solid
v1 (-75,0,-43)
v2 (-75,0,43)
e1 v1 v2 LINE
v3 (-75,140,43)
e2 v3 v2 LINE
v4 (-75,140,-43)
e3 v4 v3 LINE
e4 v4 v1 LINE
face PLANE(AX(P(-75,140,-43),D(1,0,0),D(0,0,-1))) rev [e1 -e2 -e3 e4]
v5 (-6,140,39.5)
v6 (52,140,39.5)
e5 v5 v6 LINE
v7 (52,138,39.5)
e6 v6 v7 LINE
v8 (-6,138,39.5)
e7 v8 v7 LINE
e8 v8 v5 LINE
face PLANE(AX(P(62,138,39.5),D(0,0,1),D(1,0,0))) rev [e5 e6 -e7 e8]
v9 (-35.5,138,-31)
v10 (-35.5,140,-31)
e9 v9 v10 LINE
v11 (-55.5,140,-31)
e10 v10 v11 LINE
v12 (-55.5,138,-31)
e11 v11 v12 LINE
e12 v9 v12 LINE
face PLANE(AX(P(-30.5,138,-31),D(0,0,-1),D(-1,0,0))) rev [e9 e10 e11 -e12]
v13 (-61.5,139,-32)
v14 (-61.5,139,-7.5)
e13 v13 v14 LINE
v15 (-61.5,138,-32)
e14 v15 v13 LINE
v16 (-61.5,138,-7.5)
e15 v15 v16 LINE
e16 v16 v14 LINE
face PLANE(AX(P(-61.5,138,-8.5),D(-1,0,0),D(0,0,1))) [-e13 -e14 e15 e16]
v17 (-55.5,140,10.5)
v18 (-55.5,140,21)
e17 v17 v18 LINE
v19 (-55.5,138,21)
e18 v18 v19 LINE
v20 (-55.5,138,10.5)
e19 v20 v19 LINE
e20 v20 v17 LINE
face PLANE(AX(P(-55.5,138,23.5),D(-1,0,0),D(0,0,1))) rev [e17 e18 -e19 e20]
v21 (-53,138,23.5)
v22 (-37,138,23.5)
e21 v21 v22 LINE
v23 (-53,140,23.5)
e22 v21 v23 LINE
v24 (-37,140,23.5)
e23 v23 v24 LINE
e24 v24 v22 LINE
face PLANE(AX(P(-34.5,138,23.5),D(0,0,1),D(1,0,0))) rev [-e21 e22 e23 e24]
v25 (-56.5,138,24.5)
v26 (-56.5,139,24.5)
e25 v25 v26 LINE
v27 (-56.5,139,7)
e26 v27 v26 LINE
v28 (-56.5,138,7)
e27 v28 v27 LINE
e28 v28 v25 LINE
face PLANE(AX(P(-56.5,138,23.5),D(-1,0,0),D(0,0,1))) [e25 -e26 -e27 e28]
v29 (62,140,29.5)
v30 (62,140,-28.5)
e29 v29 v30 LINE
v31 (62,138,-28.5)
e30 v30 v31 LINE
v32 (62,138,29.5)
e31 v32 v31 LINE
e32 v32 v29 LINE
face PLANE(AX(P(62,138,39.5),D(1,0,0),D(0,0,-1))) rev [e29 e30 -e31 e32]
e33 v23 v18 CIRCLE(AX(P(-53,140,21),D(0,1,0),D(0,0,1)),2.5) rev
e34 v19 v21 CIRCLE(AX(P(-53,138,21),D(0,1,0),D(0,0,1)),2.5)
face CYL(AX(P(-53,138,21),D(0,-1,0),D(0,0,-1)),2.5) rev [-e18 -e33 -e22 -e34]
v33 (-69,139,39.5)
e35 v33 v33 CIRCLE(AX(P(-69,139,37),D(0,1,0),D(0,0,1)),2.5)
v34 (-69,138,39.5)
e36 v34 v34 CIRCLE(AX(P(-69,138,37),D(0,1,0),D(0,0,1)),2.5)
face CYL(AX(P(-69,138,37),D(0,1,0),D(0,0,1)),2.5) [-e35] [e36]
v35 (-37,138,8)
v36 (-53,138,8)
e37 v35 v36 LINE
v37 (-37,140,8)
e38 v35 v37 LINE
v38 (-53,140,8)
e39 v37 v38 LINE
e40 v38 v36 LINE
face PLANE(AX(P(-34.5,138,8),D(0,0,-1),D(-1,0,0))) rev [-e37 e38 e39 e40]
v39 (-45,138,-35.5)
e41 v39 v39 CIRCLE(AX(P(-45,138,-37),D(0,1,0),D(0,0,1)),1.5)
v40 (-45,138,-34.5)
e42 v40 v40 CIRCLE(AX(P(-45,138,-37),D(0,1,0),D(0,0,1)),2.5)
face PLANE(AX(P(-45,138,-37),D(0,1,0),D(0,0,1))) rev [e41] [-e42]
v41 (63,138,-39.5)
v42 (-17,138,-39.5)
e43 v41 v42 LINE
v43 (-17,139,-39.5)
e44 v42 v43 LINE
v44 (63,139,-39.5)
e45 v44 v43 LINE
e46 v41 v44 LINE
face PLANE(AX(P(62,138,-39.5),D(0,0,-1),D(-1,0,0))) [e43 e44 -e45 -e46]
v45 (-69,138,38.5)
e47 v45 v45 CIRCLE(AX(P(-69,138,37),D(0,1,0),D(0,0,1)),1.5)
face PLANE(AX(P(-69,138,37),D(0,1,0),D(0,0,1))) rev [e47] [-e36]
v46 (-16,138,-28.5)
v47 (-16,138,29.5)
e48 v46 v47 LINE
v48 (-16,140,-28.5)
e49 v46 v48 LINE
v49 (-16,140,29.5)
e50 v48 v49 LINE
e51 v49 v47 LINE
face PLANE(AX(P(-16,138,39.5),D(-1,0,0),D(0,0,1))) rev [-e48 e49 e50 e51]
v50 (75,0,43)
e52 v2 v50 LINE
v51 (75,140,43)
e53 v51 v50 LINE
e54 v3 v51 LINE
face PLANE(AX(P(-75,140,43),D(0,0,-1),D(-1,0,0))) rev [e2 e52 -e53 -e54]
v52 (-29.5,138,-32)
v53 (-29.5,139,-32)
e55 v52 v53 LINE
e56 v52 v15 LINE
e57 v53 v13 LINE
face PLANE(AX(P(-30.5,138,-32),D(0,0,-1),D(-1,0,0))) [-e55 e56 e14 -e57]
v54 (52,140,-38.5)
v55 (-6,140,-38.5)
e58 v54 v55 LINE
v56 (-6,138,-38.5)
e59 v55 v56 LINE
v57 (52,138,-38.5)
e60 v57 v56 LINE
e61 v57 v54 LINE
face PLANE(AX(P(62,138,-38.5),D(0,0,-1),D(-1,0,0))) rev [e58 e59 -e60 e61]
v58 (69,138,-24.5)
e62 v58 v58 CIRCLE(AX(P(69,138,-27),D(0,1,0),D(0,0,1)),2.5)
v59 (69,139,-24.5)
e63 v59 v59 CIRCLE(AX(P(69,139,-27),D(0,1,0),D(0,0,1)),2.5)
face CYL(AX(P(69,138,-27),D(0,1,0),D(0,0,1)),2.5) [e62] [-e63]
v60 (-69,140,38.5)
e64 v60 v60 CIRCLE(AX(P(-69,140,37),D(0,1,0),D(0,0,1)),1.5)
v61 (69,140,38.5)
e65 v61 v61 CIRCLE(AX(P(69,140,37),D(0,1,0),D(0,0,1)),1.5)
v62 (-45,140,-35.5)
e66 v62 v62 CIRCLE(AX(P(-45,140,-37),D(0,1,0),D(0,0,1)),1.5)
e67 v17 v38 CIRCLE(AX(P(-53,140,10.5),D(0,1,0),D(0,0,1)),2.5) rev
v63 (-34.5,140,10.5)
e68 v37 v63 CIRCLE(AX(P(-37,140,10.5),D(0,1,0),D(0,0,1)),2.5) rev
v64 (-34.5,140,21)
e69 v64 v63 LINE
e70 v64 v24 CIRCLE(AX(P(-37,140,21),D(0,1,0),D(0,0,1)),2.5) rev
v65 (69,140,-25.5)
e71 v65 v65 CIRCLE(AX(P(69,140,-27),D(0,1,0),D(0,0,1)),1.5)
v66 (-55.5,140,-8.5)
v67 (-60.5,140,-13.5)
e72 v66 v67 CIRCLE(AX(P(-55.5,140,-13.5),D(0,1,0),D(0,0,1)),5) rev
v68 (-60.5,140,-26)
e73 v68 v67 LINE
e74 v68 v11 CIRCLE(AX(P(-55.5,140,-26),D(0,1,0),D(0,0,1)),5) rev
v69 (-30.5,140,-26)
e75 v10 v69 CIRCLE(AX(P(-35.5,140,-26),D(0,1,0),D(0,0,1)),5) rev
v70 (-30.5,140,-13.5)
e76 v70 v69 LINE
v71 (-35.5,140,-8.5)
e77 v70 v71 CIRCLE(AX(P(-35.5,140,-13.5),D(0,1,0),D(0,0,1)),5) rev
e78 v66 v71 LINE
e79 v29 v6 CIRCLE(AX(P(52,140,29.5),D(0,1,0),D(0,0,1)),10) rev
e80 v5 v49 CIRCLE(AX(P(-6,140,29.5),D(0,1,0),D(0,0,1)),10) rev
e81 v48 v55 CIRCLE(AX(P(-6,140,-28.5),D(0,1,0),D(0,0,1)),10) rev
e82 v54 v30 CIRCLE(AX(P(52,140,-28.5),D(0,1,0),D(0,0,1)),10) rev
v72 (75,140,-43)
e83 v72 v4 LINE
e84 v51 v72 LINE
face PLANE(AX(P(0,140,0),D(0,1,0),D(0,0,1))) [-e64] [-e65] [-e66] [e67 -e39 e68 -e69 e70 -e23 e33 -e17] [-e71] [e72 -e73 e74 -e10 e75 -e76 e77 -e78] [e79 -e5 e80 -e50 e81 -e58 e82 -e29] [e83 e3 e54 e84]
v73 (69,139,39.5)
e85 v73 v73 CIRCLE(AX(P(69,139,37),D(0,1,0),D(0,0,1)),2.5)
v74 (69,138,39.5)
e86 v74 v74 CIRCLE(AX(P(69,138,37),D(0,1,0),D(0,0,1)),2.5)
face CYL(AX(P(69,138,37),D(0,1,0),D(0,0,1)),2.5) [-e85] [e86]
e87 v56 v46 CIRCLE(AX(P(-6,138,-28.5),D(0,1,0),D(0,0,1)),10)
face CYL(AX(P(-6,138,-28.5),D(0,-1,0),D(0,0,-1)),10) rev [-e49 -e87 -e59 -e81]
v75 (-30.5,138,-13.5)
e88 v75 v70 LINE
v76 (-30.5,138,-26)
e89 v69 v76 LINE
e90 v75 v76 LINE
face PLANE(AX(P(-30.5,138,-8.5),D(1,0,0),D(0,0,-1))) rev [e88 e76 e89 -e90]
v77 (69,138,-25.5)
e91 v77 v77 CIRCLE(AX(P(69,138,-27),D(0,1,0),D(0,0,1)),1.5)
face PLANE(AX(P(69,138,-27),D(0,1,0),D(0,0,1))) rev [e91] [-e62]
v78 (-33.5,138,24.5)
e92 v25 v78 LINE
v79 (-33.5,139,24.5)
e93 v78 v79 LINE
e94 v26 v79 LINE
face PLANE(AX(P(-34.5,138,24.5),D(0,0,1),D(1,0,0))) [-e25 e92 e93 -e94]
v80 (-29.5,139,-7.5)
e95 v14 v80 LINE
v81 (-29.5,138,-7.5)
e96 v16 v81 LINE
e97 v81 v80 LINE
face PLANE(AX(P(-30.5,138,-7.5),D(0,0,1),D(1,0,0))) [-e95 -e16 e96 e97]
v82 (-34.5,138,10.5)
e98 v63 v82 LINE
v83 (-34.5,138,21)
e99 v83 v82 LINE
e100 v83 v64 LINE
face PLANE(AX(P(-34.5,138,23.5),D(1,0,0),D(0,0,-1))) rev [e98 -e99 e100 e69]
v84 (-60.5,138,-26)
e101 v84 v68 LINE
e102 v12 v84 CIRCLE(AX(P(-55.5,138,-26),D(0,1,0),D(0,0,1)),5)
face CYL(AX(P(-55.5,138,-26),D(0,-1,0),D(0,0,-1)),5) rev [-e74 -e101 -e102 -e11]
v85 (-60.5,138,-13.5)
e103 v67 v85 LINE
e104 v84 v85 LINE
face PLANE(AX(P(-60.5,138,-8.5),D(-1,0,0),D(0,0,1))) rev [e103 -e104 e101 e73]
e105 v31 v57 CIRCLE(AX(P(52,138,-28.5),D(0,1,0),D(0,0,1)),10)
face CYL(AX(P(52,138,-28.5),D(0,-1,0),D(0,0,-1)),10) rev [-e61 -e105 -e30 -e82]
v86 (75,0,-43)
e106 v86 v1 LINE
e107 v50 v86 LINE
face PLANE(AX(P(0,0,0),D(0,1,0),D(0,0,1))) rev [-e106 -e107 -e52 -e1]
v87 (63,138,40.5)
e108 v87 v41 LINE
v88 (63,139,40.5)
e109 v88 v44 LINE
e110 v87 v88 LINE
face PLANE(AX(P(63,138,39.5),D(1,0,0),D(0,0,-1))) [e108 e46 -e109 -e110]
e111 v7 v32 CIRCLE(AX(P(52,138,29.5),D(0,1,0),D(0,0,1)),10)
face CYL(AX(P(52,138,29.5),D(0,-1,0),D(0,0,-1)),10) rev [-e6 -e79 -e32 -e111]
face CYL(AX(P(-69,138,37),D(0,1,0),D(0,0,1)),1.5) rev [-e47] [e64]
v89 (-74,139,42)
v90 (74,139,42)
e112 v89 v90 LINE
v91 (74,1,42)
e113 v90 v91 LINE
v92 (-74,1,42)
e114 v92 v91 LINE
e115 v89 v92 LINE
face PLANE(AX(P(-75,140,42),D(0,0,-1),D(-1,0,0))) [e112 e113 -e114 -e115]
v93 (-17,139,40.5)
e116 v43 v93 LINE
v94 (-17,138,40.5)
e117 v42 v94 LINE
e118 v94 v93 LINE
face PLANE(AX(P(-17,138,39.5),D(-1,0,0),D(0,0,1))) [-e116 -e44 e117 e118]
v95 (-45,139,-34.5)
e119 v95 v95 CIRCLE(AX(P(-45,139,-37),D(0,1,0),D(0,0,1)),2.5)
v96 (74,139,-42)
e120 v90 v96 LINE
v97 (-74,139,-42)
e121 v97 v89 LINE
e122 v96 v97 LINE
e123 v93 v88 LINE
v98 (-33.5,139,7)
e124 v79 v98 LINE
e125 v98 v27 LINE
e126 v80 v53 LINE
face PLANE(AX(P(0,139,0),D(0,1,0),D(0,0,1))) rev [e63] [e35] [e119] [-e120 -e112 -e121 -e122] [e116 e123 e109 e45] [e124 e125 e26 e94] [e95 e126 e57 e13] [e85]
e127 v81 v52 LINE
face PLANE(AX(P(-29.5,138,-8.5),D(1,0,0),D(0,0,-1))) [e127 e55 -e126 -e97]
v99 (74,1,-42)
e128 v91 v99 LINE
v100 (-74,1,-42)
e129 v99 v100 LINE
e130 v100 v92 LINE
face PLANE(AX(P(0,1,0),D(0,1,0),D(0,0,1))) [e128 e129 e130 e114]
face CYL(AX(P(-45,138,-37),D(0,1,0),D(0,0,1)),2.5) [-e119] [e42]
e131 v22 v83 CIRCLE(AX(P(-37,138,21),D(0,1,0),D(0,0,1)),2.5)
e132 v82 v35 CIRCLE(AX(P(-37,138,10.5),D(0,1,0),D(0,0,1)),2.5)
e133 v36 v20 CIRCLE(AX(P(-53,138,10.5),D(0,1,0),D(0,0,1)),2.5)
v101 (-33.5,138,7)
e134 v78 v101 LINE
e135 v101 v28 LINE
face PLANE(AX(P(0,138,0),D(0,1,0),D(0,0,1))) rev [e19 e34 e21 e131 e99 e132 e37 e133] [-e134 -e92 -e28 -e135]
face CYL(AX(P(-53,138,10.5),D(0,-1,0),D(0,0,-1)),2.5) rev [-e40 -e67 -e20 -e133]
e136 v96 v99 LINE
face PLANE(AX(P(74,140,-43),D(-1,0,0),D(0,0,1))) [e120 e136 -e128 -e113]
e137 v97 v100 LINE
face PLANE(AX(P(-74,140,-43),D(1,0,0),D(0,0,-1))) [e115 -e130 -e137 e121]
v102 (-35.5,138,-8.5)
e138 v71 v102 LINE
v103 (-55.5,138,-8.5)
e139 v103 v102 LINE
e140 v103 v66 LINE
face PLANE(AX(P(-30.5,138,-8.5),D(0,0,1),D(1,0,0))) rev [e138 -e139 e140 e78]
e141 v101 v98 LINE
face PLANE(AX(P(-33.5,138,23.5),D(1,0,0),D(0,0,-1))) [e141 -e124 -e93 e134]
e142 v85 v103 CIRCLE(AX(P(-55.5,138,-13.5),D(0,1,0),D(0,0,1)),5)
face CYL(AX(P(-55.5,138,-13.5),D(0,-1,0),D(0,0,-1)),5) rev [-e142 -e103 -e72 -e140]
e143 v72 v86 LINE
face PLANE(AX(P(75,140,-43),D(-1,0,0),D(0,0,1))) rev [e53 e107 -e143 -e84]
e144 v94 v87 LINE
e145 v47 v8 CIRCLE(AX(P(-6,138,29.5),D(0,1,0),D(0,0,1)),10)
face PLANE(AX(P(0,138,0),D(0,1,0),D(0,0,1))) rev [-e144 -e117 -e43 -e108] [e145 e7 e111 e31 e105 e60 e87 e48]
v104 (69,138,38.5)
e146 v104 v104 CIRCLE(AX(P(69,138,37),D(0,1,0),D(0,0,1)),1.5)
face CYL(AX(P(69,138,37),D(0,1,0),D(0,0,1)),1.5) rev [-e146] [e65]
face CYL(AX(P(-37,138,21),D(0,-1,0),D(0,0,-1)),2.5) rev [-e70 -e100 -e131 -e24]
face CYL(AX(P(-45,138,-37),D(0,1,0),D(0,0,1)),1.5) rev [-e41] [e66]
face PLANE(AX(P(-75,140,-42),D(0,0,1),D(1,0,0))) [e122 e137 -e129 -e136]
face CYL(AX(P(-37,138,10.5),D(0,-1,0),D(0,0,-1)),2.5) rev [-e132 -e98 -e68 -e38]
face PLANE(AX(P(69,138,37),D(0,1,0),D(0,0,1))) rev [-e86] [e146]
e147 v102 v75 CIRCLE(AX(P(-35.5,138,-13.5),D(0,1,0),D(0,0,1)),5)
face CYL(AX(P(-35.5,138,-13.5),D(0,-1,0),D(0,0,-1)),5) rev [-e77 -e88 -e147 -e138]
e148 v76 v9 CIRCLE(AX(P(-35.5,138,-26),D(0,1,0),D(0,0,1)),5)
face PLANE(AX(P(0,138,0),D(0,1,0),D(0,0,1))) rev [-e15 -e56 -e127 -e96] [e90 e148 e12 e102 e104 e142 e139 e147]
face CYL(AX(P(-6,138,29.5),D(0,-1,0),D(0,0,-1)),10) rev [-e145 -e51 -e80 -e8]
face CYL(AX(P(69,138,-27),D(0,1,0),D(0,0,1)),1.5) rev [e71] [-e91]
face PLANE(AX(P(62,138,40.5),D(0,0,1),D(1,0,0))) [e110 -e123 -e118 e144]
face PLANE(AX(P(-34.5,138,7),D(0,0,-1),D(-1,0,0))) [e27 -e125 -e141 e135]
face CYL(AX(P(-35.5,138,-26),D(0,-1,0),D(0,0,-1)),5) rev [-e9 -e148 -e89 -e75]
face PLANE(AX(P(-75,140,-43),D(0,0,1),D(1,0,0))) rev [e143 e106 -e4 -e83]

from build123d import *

# Parameters (mm, degrees)
SKETCH1_W            = 150
SKETCH1_H            = 86
BOSS_EXTRUDE1_DEPTH  = 140
SKETCH2_R            = 1.5
SKETCH2_W            = 78
SKETCH2_H            = 78
SKETCH2_W_2          = 30
SKETCH2_H_2          = 22.5
SKETCH2_W_3          = 21
SKETCH2_H_3          = 15.5
CUT_EXTRUDE1_DEPTH   = 2
SHELL4_START         = 1
SHELL4_OUTLINE_W     = 148
SHELL4_OUTLINE_H     = 84
SHELL4_DEPTH         = 137
SHELL4_START_2       = 138
SHELL4_2_OUTLINE_W   = 148
SHELL4_2_OUTLINE_H   = 84
SHELL4_2_OUTLINE_R   = 2.5
SHELL4_2_OUTLINE_W_2 = 23
SHELL4_2_OUTLINE_H_2 = 17.5
SHELL4_2_OUTLINE_W_3 = 80
SHELL4_2_OUTLINE_H_3 = 80
SHELL4_2_OUTLINE_W_4 = 32
SHELL4_2_OUTLINE_H_4 = 24.5
SHELL4_2_DEPTH       = 1
FILLET1_R            = 10
FILLET2_R            = 5
FILLET3_R            = 2.5


# Read off the part's stored shape, not the designer's step: Shell4
with BuildPart() as part:
    # Sketch1 → Boss-Extrude1 (new body)
    with BuildSketch(Plane(origin=(0, 0, 0), x_dir=(1, 0, 0), z_dir=(0, 1, 0))):
        Rectangle(SKETCH1_W, SKETCH1_H)
    extrude(amount=BOSS_EXTRUDE1_DEPTH)

    # Sketch2 → Cut-Extrude1 (cut)
    with BuildSketch(Plane(origin=(0, 140, 0), x_dir=(1, 0, 0), z_dir=(0, 1, 0))):
        with Locations(Location((69, -37, 0), (0, 0, 270))):
            Circle(SKETCH2_R)
        with Locations(Location((69, 27, 0), (0, 0, 270))):
            Circle(SKETCH2_R)
        with Locations(Location((-69, -37, 0), (0, 0, 270))):
            Circle(SKETCH2_R)
        with Locations(Location((-45, 37, 0), (0, 0, 270))):
            Circle(SKETCH2_R)
        with Locations((23, -0.5)):
            Rectangle(SKETCH2_W, SKETCH2_H)
        with Locations((-45.5, 19.75)):
            Rectangle(SKETCH2_W_2, SKETCH2_H_2)
        with Locations((-45, -15.75)):
            Rectangle(SKETCH2_W_3, SKETCH2_H_3)
    extrude(amount=-CUT_EXTRUDE1_DEPTH, mode=Mode.SUBTRACT)

    # Shell4 outline → Shell4 (cut)
    with BuildSketch(Plane(origin=(0, 0, 0), x_dir=(1, 0, 0), z_dir=(0, 1, 0)).offset(SHELL4_START)):
        Rectangle(SHELL4_OUTLINE_W, SHELL4_OUTLINE_H)
    extrude(amount=SHELL4_DEPTH, mode=Mode.SUBTRACT)

    # Shell4 2 outline → Shell4 2 (cut)
    with BuildSketch(Plane(origin=(0, 0, 0), x_dir=(1, 0, 0), z_dir=(0, 1, 0)).offset(SHELL4_START_2)):
        Rectangle(SHELL4_2_OUTLINE_W, SHELL4_2_OUTLINE_H)
        with Locations((-69, -37)):
            Circle(SHELL4_2_OUTLINE_R, mode=Mode.SUBTRACT)
        with Locations((-45, -15.75)):
            Rectangle(SHELL4_2_OUTLINE_W_2, SHELL4_2_OUTLINE_H_2, mode=Mode.SUBTRACT)
        with Locations((69, -37)):
            Circle(SHELL4_2_OUTLINE_R, mode=Mode.SUBTRACT)
        with Locations((23, -0.5)):
            Rectangle(SHELL4_2_OUTLINE_W_3, SHELL4_2_OUTLINE_H_3, mode=Mode.SUBTRACT)
        with Locations((-45.5, 19.75)):
            Rectangle(SHELL4_2_OUTLINE_W_4, SHELL4_2_OUTLINE_H_4, mode=Mode.SUBTRACT)
        with Locations((-45, 37)):
            Circle(SHELL4_2_OUTLINE_R, mode=Mode.SUBTRACT)
        with Locations((69, 27)):
            Circle(SHELL4_2_OUTLINE_R, mode=Mode.SUBTRACT)
    extrude(amount=SHELL4_2_DEPTH, mode=Mode.SUBTRACT)

    # Fillet1
    fillet1_edges = [part.edges().sort_by_distance(p)[0] for p in [
        (-16, 139, 39.5),
        (-16, 139, -38.5),
        (62, 139, -38.5),
        (62, 139, 39.5),
    ]]
    fillet(fillet1_edges, radius=FILLET1_R)

    # Fillet2
    fillet2_edges = [part.edges().sort_by_distance(p)[0] for p in [
        (-60.5, 139, -8.5),
        (-60.5, 139, -31),
        (-30.5, 139, -31),
        (-30.5, 139, -8.5),
    ]]
    fillet(fillet2_edges, radius=FILLET2_R)

    # Fillet3
    fillet3_edges = [part.edges().sort_by_distance(p)[0] for p in [
        (-55.5, 139, 23.5),
        (-55.5, 139, 8),
        (-34.5, 139, 8),
        (-34.5, 139, 23.5),
    ]]
    fillet(fillet3_edges, radius=FILLET3_R)


solid = part.part
